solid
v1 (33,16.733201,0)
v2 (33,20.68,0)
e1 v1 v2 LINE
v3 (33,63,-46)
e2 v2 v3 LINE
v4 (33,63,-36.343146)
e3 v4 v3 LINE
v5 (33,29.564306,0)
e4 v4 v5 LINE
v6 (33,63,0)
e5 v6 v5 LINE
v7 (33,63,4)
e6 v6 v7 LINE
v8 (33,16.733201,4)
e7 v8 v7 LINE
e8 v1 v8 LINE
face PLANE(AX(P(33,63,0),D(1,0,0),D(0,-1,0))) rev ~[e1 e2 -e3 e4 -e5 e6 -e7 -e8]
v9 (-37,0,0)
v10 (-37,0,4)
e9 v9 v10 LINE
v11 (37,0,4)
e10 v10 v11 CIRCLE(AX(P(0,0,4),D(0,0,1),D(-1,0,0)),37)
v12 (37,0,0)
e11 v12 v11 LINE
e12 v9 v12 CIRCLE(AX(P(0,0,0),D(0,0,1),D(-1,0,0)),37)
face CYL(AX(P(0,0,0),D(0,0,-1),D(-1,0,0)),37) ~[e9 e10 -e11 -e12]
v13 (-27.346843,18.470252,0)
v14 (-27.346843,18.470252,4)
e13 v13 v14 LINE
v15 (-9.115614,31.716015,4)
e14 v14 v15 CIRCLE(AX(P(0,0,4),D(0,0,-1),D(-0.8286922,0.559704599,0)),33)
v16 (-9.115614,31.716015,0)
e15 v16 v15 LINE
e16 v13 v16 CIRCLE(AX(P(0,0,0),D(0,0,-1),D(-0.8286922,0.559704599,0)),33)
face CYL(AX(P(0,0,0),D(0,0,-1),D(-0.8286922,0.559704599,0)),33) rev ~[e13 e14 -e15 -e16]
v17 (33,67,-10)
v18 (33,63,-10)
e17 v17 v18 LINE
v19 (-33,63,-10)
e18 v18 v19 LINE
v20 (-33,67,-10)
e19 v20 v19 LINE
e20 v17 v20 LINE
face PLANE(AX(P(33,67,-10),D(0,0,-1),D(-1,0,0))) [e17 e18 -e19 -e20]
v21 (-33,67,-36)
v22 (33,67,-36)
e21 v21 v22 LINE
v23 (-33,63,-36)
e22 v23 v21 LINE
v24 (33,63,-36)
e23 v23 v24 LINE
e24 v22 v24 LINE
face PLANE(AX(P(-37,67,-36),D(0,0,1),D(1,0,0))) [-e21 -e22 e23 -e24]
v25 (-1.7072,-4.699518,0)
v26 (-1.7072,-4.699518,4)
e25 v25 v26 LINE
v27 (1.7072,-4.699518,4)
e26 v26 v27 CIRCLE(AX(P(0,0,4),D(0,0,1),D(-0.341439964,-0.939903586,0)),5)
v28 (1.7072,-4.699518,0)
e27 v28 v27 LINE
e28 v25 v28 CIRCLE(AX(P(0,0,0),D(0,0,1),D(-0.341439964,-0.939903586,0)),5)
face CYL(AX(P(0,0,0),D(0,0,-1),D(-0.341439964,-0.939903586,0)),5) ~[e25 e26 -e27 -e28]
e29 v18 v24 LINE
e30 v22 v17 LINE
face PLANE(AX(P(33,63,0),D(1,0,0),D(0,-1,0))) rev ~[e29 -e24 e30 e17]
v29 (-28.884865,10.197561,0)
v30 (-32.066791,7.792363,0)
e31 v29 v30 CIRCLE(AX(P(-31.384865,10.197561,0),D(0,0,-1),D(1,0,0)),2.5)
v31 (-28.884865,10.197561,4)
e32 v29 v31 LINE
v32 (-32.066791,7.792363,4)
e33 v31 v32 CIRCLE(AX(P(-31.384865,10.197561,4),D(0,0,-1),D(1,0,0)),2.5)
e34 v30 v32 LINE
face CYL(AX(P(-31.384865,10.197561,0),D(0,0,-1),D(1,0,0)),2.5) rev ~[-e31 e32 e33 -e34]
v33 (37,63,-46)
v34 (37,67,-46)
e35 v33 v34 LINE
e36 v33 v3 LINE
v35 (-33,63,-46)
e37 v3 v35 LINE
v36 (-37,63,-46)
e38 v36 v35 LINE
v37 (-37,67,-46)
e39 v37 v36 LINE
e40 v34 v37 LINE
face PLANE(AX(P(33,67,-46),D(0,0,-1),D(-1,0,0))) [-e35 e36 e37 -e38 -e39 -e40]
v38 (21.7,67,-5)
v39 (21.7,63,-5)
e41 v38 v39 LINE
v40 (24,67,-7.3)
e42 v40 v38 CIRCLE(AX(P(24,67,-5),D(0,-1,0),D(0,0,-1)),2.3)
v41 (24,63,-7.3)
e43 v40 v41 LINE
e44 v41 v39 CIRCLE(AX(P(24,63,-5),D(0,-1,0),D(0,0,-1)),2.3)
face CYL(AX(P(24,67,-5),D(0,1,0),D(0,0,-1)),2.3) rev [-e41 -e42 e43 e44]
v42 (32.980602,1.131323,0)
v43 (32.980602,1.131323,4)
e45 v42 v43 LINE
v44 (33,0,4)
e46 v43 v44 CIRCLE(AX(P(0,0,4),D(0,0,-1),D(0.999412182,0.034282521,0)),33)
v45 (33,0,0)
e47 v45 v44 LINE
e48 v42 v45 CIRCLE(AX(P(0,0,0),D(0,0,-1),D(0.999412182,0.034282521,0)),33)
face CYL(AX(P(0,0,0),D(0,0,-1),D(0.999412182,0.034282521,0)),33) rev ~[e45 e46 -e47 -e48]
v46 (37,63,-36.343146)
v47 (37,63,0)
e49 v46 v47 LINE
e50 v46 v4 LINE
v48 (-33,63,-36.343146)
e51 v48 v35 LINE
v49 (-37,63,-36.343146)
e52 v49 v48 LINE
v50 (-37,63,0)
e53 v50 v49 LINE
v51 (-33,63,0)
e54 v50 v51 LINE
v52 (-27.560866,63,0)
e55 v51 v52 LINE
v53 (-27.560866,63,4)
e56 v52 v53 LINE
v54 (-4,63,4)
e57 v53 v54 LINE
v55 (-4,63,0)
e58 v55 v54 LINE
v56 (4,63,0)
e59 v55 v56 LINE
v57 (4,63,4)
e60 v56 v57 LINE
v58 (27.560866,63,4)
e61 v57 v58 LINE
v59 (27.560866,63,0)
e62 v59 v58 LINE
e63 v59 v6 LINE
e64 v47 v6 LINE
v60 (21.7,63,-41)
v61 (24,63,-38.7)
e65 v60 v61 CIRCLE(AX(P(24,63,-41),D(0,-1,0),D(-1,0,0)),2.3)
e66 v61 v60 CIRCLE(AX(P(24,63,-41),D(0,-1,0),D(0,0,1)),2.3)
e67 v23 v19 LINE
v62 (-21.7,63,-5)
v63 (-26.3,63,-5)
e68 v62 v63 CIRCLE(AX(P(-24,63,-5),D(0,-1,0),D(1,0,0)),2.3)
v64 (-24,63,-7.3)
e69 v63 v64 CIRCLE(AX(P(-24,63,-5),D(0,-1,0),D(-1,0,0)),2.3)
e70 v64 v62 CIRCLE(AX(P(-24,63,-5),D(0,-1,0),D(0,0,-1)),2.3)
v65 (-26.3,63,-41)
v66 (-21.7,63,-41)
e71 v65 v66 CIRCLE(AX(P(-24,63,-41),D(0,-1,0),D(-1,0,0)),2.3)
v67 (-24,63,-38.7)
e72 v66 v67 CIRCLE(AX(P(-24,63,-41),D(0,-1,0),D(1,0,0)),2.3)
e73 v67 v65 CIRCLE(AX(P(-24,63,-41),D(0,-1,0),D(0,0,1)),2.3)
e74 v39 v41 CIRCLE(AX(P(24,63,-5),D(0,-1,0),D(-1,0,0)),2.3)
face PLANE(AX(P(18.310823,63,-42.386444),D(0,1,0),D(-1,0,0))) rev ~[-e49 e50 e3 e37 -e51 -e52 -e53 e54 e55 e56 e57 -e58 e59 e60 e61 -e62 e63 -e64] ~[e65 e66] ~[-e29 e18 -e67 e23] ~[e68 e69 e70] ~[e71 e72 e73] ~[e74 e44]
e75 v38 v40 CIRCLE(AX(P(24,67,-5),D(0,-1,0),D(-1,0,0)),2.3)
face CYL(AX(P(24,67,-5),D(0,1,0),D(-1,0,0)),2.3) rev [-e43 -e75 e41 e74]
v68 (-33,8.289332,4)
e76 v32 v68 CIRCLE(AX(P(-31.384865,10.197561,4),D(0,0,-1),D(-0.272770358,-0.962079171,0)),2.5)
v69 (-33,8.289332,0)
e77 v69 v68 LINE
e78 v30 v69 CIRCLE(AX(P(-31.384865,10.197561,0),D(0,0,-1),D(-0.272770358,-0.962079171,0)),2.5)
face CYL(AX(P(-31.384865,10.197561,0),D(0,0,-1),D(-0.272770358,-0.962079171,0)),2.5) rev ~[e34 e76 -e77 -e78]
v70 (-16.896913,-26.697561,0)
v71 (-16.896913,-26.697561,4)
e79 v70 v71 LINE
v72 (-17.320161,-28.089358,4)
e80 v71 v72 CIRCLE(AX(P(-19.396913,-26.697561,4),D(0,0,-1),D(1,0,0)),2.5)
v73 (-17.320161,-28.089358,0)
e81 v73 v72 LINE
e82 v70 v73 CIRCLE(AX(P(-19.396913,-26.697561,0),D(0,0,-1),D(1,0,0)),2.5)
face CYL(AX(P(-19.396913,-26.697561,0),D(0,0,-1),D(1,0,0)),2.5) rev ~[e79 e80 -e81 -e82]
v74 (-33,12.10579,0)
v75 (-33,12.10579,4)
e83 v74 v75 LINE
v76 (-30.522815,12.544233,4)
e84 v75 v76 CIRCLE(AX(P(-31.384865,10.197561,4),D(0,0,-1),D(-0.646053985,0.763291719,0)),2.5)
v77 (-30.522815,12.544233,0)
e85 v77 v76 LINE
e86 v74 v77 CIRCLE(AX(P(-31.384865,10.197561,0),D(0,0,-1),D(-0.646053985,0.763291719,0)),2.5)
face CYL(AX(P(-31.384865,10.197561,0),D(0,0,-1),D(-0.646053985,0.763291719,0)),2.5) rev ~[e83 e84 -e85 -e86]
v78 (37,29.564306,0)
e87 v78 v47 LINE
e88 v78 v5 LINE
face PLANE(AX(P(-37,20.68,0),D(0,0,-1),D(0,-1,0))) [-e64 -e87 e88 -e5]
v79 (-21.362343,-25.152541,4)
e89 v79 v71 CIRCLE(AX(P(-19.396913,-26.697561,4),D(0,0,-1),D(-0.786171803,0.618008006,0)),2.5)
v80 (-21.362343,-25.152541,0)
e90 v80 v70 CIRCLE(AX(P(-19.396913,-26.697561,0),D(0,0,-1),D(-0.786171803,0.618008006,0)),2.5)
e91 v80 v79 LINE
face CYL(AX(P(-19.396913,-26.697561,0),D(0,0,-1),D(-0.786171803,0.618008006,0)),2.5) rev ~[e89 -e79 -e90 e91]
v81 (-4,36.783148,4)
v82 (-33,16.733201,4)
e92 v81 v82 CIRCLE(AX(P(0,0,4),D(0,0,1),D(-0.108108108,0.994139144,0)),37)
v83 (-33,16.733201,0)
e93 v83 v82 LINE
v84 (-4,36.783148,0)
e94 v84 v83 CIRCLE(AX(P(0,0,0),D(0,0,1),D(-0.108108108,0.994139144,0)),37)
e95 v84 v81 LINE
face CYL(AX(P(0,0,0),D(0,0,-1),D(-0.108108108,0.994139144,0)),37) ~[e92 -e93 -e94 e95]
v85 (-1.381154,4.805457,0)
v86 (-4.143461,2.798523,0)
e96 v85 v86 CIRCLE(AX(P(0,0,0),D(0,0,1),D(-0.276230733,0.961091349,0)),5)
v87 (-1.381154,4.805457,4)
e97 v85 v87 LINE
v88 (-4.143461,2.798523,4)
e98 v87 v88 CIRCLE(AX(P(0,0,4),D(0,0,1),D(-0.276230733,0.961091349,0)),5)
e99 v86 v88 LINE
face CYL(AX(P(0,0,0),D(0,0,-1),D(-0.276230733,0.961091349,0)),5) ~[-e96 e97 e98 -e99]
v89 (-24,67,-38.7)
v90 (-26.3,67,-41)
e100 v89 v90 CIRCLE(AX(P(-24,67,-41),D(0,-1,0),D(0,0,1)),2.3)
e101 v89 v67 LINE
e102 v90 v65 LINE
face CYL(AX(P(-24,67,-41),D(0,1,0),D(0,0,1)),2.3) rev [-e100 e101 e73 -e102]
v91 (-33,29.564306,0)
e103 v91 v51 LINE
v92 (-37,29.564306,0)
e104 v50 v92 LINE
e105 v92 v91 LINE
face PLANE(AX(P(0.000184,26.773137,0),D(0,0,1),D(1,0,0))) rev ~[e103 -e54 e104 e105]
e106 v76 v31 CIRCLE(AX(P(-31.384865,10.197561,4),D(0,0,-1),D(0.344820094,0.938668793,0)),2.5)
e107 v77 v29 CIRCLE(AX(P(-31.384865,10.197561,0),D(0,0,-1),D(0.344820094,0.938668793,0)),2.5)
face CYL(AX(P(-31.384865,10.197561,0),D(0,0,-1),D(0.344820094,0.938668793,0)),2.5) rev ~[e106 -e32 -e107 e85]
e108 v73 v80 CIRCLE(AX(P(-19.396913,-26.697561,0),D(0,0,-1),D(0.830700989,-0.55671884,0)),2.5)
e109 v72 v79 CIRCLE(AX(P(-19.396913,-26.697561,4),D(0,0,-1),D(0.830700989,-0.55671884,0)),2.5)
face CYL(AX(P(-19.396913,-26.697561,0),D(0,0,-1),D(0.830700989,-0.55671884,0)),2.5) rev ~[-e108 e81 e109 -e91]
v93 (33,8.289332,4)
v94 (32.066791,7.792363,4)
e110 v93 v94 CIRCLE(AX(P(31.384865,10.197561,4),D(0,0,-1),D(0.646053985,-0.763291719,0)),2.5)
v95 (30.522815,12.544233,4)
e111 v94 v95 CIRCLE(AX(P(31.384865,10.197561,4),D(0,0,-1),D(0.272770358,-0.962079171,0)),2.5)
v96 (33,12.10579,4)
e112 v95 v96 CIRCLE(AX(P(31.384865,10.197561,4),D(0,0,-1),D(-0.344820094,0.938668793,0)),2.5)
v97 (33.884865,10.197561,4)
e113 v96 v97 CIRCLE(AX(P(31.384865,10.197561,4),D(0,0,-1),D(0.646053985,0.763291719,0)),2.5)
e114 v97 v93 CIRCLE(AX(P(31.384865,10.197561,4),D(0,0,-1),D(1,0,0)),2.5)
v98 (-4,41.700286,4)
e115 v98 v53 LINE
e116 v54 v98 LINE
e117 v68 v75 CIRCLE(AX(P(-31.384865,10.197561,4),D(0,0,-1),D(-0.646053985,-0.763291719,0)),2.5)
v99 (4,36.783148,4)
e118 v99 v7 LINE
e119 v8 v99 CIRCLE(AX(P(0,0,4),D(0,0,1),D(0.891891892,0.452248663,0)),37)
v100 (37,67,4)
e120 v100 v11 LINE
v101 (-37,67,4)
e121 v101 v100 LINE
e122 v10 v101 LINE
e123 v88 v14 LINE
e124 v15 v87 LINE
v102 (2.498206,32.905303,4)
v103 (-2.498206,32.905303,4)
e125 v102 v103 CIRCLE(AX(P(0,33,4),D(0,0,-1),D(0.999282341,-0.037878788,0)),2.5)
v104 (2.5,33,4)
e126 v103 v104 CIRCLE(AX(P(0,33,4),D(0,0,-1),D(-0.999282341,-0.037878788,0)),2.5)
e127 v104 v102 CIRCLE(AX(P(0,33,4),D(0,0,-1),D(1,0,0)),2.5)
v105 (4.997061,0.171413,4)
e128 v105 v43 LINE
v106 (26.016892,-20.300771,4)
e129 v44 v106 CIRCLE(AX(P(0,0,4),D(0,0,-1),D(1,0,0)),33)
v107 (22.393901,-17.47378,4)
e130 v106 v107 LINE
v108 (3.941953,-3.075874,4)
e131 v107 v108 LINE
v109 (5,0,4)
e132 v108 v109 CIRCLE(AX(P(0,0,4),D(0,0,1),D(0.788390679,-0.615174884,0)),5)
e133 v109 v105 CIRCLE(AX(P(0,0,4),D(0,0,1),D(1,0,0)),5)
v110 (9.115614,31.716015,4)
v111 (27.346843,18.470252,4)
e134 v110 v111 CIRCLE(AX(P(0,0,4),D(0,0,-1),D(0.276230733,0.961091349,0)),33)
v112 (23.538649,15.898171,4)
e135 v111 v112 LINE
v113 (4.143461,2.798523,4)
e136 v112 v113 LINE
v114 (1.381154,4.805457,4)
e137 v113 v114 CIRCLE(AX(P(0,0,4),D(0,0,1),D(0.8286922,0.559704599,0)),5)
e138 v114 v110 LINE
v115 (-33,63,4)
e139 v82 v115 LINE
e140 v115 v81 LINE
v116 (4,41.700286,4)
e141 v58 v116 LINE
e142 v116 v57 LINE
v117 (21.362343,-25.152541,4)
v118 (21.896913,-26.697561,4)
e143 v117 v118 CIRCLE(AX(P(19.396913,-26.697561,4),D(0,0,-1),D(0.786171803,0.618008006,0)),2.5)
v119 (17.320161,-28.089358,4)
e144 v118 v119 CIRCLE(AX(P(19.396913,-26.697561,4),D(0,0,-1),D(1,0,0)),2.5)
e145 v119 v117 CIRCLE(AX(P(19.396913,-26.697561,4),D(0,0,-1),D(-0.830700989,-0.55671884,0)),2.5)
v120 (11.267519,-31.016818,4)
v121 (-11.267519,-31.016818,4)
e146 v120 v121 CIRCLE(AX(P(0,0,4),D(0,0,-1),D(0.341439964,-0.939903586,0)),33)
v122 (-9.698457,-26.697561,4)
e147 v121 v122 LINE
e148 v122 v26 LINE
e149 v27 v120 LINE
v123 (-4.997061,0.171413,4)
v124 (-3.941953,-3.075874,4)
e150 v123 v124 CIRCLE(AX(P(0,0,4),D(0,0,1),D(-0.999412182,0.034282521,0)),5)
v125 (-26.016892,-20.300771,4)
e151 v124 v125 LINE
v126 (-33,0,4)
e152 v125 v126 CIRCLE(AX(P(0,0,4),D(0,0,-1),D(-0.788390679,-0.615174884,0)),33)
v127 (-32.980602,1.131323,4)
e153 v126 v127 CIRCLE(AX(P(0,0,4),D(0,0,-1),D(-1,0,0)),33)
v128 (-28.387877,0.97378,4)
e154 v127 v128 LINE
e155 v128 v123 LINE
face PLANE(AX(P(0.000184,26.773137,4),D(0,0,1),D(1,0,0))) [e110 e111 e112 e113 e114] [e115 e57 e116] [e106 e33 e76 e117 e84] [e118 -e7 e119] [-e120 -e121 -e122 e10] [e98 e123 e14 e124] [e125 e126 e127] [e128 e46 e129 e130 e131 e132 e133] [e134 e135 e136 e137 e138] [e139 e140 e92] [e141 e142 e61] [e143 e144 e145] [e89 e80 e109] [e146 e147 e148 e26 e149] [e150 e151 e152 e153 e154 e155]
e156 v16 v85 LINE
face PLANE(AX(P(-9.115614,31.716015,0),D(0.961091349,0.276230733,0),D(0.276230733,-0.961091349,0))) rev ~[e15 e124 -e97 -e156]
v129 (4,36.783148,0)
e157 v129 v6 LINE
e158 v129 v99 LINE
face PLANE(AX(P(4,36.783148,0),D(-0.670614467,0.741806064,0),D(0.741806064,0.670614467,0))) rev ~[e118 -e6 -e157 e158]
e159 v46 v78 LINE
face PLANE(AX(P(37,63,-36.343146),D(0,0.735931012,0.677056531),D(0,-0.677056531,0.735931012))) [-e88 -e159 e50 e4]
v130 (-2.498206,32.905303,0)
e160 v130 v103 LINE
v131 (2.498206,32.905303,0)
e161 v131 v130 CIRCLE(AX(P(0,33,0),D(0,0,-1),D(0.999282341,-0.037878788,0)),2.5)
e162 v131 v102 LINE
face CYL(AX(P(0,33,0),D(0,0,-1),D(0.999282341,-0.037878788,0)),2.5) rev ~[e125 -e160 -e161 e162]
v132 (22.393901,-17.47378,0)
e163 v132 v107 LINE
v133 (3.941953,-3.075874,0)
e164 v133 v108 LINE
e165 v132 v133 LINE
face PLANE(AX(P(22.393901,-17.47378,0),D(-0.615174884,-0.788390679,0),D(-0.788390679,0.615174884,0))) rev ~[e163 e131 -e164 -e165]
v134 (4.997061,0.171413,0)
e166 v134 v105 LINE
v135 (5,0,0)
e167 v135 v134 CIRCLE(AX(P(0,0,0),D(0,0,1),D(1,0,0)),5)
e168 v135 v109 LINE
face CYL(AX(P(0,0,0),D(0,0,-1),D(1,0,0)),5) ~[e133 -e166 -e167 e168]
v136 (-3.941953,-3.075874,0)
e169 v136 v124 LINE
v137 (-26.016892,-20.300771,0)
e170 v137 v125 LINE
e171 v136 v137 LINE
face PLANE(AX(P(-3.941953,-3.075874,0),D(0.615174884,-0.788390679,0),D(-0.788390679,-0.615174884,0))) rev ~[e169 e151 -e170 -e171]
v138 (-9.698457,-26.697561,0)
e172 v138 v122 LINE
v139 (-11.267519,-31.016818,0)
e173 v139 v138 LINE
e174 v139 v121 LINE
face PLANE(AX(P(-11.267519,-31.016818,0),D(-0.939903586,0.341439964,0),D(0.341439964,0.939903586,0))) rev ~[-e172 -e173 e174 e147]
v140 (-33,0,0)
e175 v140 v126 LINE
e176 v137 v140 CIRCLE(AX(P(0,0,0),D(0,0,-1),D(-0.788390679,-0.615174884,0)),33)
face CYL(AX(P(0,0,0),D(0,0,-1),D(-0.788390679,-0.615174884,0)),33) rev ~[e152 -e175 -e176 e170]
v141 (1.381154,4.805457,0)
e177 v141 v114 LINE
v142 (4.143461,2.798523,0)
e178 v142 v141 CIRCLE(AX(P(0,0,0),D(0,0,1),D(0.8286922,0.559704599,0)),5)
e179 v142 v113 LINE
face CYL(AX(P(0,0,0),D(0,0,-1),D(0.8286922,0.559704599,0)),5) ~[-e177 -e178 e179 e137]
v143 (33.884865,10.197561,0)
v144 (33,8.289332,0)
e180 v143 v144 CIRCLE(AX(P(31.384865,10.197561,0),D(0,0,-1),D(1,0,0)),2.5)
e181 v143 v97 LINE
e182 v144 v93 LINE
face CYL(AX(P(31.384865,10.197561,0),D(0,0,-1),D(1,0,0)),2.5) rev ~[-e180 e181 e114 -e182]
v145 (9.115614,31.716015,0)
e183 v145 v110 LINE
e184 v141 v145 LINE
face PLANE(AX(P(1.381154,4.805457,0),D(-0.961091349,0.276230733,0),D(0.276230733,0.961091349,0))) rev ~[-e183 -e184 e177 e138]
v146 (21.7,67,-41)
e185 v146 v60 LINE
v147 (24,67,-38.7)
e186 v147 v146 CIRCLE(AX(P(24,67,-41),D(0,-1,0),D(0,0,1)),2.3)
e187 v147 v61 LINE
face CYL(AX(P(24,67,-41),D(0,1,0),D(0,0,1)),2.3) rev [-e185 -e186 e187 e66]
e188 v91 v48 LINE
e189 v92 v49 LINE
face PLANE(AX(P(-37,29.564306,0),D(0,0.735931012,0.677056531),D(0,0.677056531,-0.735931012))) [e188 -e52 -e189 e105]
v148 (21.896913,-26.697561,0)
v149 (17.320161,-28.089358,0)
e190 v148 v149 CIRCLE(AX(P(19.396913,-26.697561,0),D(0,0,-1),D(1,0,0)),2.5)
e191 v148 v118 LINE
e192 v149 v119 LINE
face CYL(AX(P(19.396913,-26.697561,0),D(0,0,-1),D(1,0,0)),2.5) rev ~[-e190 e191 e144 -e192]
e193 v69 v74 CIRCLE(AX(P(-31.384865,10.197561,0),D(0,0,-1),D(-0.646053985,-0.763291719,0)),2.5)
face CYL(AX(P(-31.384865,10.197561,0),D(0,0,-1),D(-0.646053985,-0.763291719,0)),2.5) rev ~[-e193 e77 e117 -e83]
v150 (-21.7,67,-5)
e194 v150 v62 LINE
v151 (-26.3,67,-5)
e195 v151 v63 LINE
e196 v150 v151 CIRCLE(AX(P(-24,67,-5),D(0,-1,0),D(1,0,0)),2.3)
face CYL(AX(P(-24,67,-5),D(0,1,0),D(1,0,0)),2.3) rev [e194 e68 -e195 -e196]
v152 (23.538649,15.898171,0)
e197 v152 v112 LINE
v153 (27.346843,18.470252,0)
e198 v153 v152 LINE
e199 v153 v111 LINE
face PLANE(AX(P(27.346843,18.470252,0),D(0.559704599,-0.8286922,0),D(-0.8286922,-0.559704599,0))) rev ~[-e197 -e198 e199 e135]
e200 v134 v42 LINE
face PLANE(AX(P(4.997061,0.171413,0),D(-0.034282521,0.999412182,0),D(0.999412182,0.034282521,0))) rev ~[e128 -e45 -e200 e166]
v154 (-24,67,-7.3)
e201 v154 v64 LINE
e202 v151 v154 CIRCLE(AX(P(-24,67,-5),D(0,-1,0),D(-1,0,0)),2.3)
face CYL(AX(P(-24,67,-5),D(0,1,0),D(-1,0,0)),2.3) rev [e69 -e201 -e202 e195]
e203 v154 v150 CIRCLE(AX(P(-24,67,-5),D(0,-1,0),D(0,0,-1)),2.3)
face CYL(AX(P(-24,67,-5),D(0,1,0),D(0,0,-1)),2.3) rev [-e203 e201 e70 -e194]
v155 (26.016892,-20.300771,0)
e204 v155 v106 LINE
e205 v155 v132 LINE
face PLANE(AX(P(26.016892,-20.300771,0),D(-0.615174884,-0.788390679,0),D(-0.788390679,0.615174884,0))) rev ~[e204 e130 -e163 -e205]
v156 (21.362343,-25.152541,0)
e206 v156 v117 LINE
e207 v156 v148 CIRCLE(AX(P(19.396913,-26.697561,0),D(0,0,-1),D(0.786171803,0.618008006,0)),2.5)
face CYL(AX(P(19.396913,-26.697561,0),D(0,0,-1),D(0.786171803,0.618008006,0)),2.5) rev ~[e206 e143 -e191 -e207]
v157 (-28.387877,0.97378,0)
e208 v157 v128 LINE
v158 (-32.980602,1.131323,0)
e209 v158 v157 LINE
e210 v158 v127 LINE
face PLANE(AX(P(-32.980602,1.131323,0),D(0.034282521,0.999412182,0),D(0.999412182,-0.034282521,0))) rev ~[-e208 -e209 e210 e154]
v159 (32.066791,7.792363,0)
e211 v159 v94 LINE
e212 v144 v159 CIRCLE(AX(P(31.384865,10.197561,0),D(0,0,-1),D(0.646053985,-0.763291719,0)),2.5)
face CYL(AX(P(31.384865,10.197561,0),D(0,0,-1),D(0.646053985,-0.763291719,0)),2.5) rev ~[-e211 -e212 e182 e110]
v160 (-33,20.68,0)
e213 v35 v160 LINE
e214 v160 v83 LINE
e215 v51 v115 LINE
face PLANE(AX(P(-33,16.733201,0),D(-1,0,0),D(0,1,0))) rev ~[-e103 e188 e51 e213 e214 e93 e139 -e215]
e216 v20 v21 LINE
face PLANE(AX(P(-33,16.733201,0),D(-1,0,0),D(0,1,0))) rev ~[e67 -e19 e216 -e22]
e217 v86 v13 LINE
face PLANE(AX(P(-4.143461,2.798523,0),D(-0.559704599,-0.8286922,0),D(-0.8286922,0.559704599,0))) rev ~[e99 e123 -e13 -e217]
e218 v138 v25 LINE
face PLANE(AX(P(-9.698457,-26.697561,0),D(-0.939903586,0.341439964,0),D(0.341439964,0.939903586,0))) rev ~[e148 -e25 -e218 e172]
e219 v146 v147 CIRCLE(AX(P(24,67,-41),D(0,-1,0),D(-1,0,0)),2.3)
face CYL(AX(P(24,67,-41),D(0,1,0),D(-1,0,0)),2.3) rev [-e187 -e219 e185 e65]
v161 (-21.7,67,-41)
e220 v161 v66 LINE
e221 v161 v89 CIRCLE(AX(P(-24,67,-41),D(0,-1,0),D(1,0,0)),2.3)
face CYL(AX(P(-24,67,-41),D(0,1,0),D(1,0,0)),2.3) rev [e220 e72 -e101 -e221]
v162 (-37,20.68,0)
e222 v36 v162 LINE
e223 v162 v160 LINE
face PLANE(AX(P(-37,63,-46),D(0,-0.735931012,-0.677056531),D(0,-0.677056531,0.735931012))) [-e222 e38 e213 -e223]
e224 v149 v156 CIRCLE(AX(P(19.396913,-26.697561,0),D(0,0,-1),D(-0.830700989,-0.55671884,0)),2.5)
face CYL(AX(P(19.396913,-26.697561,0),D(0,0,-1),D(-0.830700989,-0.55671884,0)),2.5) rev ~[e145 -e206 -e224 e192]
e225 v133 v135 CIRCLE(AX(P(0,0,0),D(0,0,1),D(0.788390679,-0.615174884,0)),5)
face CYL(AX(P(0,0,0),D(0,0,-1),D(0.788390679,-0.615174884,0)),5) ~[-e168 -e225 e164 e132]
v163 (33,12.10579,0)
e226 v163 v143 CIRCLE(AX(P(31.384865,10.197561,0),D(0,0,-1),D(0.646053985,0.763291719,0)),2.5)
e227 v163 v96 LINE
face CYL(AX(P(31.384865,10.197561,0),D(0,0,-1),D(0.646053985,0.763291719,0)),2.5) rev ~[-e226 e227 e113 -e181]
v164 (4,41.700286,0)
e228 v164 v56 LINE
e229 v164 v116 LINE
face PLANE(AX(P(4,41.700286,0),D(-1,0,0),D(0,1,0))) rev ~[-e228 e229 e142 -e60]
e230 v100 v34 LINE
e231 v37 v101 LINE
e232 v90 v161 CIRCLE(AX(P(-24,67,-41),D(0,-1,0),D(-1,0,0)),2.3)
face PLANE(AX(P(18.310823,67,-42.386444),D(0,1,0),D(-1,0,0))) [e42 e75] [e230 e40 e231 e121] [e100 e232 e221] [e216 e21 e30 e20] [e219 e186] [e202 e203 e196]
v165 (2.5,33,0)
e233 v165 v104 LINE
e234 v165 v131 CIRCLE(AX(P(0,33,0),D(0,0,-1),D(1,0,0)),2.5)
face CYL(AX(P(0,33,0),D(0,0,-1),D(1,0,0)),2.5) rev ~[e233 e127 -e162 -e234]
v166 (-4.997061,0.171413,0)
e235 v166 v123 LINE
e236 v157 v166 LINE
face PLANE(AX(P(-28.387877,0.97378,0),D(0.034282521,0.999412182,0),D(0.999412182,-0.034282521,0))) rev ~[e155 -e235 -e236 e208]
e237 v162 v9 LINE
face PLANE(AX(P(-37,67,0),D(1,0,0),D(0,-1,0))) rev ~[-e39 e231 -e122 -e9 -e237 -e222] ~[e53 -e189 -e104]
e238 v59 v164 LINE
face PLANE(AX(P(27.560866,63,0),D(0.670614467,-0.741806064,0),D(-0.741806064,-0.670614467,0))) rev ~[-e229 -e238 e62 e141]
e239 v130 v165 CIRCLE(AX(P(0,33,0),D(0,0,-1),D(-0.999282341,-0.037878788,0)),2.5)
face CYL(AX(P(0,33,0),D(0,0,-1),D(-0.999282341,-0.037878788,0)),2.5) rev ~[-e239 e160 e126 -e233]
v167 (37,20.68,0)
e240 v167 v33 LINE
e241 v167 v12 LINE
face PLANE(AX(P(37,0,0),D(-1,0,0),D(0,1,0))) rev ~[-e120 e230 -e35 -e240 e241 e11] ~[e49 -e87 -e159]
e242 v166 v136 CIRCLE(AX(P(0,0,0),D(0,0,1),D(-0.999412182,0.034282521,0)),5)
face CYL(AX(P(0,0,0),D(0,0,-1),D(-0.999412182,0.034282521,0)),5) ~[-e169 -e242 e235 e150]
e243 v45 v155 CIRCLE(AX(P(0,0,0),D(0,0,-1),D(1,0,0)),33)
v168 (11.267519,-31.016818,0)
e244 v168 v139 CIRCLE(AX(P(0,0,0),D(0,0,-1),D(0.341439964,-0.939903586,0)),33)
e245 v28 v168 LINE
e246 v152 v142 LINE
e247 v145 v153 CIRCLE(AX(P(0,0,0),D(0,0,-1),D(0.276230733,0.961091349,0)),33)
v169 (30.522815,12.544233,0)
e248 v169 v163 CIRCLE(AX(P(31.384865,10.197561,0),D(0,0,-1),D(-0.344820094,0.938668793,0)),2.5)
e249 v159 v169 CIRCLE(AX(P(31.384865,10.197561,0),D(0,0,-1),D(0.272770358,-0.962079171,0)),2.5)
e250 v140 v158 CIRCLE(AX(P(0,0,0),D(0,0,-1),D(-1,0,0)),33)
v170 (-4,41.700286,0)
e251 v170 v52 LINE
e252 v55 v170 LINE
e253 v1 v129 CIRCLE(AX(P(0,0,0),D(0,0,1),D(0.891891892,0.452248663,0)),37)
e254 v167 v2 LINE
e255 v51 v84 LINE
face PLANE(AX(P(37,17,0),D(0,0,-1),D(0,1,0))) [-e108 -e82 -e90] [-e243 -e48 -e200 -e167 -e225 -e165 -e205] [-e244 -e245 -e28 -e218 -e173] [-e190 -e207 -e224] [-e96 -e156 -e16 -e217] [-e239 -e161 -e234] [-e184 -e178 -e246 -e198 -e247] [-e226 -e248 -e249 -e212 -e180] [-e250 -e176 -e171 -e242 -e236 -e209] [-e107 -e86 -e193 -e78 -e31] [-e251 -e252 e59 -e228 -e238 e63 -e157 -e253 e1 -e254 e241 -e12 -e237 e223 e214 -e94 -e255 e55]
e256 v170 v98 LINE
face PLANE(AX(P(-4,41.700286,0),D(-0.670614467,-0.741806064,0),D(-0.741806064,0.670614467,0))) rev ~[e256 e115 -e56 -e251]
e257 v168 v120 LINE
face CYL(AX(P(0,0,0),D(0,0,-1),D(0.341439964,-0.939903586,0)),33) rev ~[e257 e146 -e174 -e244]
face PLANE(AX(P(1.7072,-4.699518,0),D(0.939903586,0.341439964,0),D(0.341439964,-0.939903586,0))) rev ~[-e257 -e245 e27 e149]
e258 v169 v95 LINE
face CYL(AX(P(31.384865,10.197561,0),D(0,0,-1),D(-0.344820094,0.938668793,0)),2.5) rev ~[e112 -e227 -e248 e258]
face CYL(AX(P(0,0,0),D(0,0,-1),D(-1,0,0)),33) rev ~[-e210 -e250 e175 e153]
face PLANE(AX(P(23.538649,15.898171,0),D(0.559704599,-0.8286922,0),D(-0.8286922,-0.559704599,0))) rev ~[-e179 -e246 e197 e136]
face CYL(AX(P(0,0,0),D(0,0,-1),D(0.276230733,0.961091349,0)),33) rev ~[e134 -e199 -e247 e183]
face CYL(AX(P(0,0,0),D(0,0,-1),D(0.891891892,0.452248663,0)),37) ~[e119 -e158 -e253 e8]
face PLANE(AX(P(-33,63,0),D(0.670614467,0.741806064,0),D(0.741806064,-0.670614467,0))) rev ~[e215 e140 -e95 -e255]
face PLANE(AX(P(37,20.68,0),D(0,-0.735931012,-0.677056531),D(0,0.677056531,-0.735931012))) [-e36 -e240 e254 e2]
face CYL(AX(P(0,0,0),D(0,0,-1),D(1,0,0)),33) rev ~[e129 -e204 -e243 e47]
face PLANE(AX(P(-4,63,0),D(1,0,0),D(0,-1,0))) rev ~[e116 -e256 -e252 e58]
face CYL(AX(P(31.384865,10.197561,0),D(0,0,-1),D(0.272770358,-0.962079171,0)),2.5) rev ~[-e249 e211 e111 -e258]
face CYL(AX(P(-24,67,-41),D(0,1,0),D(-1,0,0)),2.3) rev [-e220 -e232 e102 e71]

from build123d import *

# Parameters (mm, degrees)
F1_DEPTH = 4
F3_DEPTH = 4
F5_DEPTH = 4
F6_W     = 4
F6_H     = 26
F6_H_2   = 10
F7_DEPTH = 4


with BuildPart() as f1:
    # F0 (on Top) → F1 (new body)
    with BuildSketch(Plane.XY):
        with BuildLine():
            ThreePointArc((-2.498205853, 32.9053030303), (-0.0473569821, 35.499551423), (2.5, 33))
            ThreePointArc((2.5, 33), (2.499551423, 32.9526430179), (2.498205853, 32.9053030303))
            ThreePointArc((2.498205853, 32.9053030303), (5.8372772609, 32.4796273713), (9.1156141969, 31.7160145323))
            ThreePointArc((9.1156141969, 31.7160145323), (19.3969133257, 26.6975608144), (27.3468425908, 18.4702517664))
            ThreePointArc((27.3468425908, 18.4702517664), (29.0861433838, 15.5883374051), (30.5228148036, 12.544232797))
            ThreePointArc((30.5228148036, 12.544232797), (31.8205738268, 12.6592996005), (33, 12.1057901124))
            Line((33, 12.1057901124), (33, 16.7332005307))
            ThreePointArc((33, 16.7332005307), (21.0416278254, 30.4343539188), (4, 36.7831483155))
            ThreePointArc((4, 36.7831483155), (0, 37), (-4, 36.7831483155))
            ThreePointArc((-4, 36.7831483155), (-21.0416278254, 30.4343539188), (-33, 16.7332005307))
            Line((-33, 16.7332005307), (-33, 12.1057901124))
            ThreePointArc((-33, 12.1057901124), (-31.8205738268, 12.6592996005), (-30.5228148036, 12.544232797))
            ThreePointArc((-30.5228148036, 12.544232797), (-29.0861433838, 15.5883374051), (-27.3468425908, 18.4702517664))
            ThreePointArc((-27.3468425908, 18.4702517664), (-19.3969133257, 26.6975608144), (-9.1156141969, 31.7160145323))
            ThreePointArc((-9.1156141969, 31.7160145323), (-5.8372772609, 32.4796273713), (-2.498205853, 32.9053030303))
        make_face()
        with BuildLine():
            ThreePointArc((2.498205853, 32.9053030303), (0, 30.5), (-2.498205853, 32.9053030303))
            ThreePointArc((-2.498205853, 32.9053030303), (-5.8372772609, 32.4796273713), (-9.1156141969, 31.7160145323))
            Line((-9.1156141969, 31.7160145323), (-7.8462162594, 27.2993902036))
            Line((-7.8462162594, 27.2993902036), (-1.3811536662, 4.8054567473))
            ThreePointArc((-1.3811536662, 4.8054567473), (0, 5), (1.3811536662, 4.8054567473))
            Line((1.3811536662, 4.8054567473), (7.8462162594, 27.2993902036))
            Line((7.8462162594, 27.2993902036), (9.1156141969, 31.7160145323))
            ThreePointArc((9.1156141969, 31.7160145323), (5.8372772609, 32.4796273713), (2.498205853, 32.9053030303))
        make_face()
        with BuildLine():
            Line((-4.1434609986, 2.7985229949), (-27.3468425908, 18.4702517664))
            ThreePointArc((-27.3468425908, 18.4702517664), (-29.0861433838, 15.5883374051), (-30.5228148036, 12.544232797))
            ThreePointArc((-30.5228148036, 12.544232797), (-29.3348497225, 11.6284476748), (-28.8848650377, 10.1975608144))
            ThreePointArc((-28.8848650377, 10.1975608144), (-29.8773529706, 8.2032169705), (-32.0667909317, 7.7923628859))
            ThreePointArc((-32.0667909317, 7.7923628859), (-32.6937791328, 4.4851762523), (-32.9806019929, 1.1313232023))
            Line((-32.9806019929, 1.1313232023), (-28.3878771097, 0.9737804072))
            Line((-28.3878771097, 0.9737804072), (-4.997060908, 0.1714126064))
            ThreePointArc((-4.997060908, 0.1714126064), (-4.7552825815, 1.5450849719), (-4.1434609986, 2.7985229949))
        make_face()
        with BuildLine():
            ThreePointArc((30.5228148036, 12.544232797), (29.0861433838, 15.5883374051), (27.3468425908, 18.4702517664))
            Line((27.3468425908, 18.4702517664), (23.5386487783, 15.8981706108))
            Line((23.5386487783, 15.8981706108), (4.1434609986, 2.7985229949))
            ThreePointArc((4.1434609986, 2.7985229949), (4.7552825815, 1.5450849719), (4.997060908, 0.1714126064))
            Line((4.997060908, 0.1714126064), (32.9806019929, 1.1313232023))
            ThreePointArc((32.9806019929, 1.1313232023), (32.6937791328, 4.4851762523), (32.0667909317, 7.7923628859))
            ThreePointArc((32.0667909317, 7.7923628859), (29.007223747, 9.4250183284), (30.5228148036, 12.544232797))
        make_face()
        with BuildLine():
            ThreePointArc((1.3811536662, 4.8054567473), (0, 5), (-1.3811536662, 4.8054567473))
            Line((-1.3811536662, 4.8054567473), (0, 0))
            Line((0, 0), (1.3811536662, 4.8054567473))
        make_face()
        with BuildLine():
            Line((0, 0), (-1.3811536662, 4.8054567473))
            ThreePointArc((-1.3811536662, 4.8054567473), (-2.9389262615, 4.0450849719), (-4.1434609986, 2.7985229949))
            Line((-4.1434609986, 2.7985229949), (0, 0))
        make_face()
        with BuildLine():
            Line((0, 0), (-4.1434609986, 2.7985229949))
            ThreePointArc((-4.1434609986, 2.7985229949), (-4.7552825815, 1.5450849719), (-4.997060908, 0.1714126064))
            Line((-4.997060908, 0.1714126064), (0, 0))
        make_face()
        with BuildLine():
            ThreePointArc((4.1434609986, 2.7985229949), (2.9389262615, 4.0450849719), (1.3811536662, 4.8054567473))
            Line((1.3811536662, 4.8054567473), (0, 0))
            Line((0, 0), (4.1434609986, 2.7985229949))
        make_face()
        with BuildLine():
            Line((-1.7071998188, -4.6995179305), (0, 0))
            Line((0, 0), (-3.9419533944, -3.0758744182))
            ThreePointArc((-3.9419533944, -3.0758744182), (-2.9389262615, -4.0450849719), (-1.7071998188, -4.6995179305))
        make_face()
        with BuildLine():
            Line((-3.9419533944, -3.0758744182), (0, 0))
            Line((0, 0), (-4.997060908, 0.1714126064))
            ThreePointArc((-4.997060908, 0.1714126064), (-4.7552825815, -1.5450849719), (-3.9419533944, -3.0758744182))
        make_face()
        with BuildLine():
            Line((3.9419533944, -3.0758744182), (0, 0))
            Line((0, 0), (1.7071998188, -4.6995179305))
            ThreePointArc((1.7071998188, -4.6995179305), (2.9389262615, -4.0450849719), (3.9419533944, -3.0758744182))
        make_face()
        with BuildLine():
            Line((1.7071998188, -4.6995179305), (0, 0))
            Line((0, 0), (-1.7071998188, -4.6995179305))
            ThreePointArc((-1.7071998188, -4.6995179305), (0, -5), (1.7071998188, -4.6995179305))
        make_face()
        with BuildLine():
            Line((4.1434609986, 2.7985229949), (0, 0))
            Line((0, 0), (4.997060908, 0.1714126064))
            ThreePointArc((4.997060908, 0.1714126064), (4.7552825815, 1.5450849719), (4.1434609986, 2.7985229949))
        make_face()
        with BuildLine():
            Line((4.997060908, 0.1714126064), (0, 0))
            Line((0, 0), (3.9419533944, -3.0758744182))
            ThreePointArc((3.9419533944, -3.0758744182), (4.7280951224, -1.6263814171), (5, 0))
            ThreePointArc((5, 0), (4.999265173, 0.0857189009), (4.997060908, 0.1714126064))
        make_face()
        with BuildLine():
            ThreePointArc((-33, 8.2893315164), (-33.8848650377, 10.1975608144), (-33, 12.1057901124))
            Line((-33, 12.1057901124), (-33, 16.7332005307))
            ThreePointArc((-33, 16.7332005307), (-35.9861084309, 8.602325267), (-37, 0))
            ThreePointArc((-37, 0), (0, -37), (37, 0))
            ThreePointArc((37, 0), (35.9861084309, 8.602325267), (33, 16.7332005307))
            Line((33, 16.7332005307), (33, 12.1057901124))
            ThreePointArc((33, 12.1057901124), (33.6528859157, 11.2492648113), (33.8848650377, 10.1975608144))
            ThreePointArc((33.8848650377, 10.1975608144), (33.6528859157, 9.1458568174), (33, 8.2893315164))
            Line((33, 8.2893315164), (33, 0))
            ThreePointArc((33, 0), (31.2054278075, -10.7341173531), (26.0168924031, -20.3007711599))
            ThreePointArc((26.0168924031, -20.3007711599), (23.8135024738, -22.8455050268), (21.3623428339, -25.152540799))
            ThreePointArc((21.3623428339, -25.152540799), (21.759493882, -25.8801177799), (21.8969133257, -26.6975608144))
            ThreePointArc((21.8969133257, -26.6975608144), (20.1242780272, -29.0894095953), (17.3201608529, -28.0893579142))
            ThreePointArc((17.3201608529, -28.0893579142), (14.3685894638, -29.7076360019), (11.2675188041, -31.016818341))
            ThreePointArc((11.2675188041, -31.016818341), (0, -33), (-11.2675188041, -31.016818341))
            ThreePointArc((-11.2675188041, -31.016818341), (-14.3685894638, -29.7076360019), (-17.3201608529, -28.0893579142))
            ThreePointArc((-17.3201608529, -28.0893579142), (-20.8663764564, -28.7201033003), (-21.3623428339, -25.152540799))
            ThreePointArc((-21.3623428339, -25.152540799), (-23.8135024738, -22.8455050268), (-26.0168924031, -20.3007711599))
            ThreePointArc((-26.0168924031, -20.3007711599), (-31.2054278075, -10.7341173531), (-33, 0))
            Line((-33, 0), (-33, 8.2893315164))
        make_face()
        with BuildLine():
            ThreePointArc((-32.9806019929, 1.1313232023), (-32.6937791328, 4.4851762523), (-32.0667909317, 7.7923628859))
            ThreePointArc((-32.0667909317, 7.7923628859), (-32.5599678414, 7.9909495208), (-33, 8.2893315164))
            Line((-33, 8.2893315164), (-33, 0))
            ThreePointArc((-33, 0), (-32.9951501418, 0.565744746), (-32.9806019929, 1.1313232023))
        make_face()
        with BuildLine():
            ThreePointArc((33, 8.2893315164), (32.5599678414, 7.9909495208), (32.0667909317, 7.7923628859))
            ThreePointArc((32.0667909317, 7.7923628859), (32.6937791328, 4.4851762523), (32.9806019929, 1.1313232023))
            ThreePointArc((32.9806019929, 1.1313232023), (32.9951501418, 0.565744746), (33, 0))
            Line((33, 0), (33, 8.2893315164))
        make_face()
        with BuildLine():
            ThreePointArc((-1.7071998188, -4.6995179305), (-2.9389262615, -4.0450849719), (-3.9419533944, -3.0758744182))
            Line((-3.9419533944, -3.0758744182), (-26.0168924031, -20.3007711599))
            ThreePointArc((-26.0168924031, -20.3007711599), (-23.8135024738, -22.8455050268), (-21.3623428339, -25.152540799))
            ThreePointArc((-21.3623428339, -25.152540799), (-18.5794702912, -24.334980258), (-16.8969133257, -26.6975608144))
            ThreePointArc((-16.8969133257, -26.6975608144), (-17.0050645447, -27.4249255159), (-17.3201608529, -28.0893579142))
            ThreePointArc((-17.3201608529, -28.0893579142), (-14.3685894638, -29.7076360019), (-11.2675188041, -31.016818341))
            Line((-11.2675188041, -31.016818341), (-9.6984566628, -26.6975608144))
            Line((-9.6984566628, -26.6975608144), (-1.7071998188, -4.6995179305))
        make_face()
        with BuildLine():
            ThreePointArc((3.9419533944, -3.0758744182), (2.9389262615, -4.0450849719), (1.7071998188, -4.6995179305))
            Line((1.7071998188, -4.6995179305), (11.2675188041, -31.016818341))
            ThreePointArc((11.2675188041, -31.016818341), (14.3685894638, -29.7076360019), (17.3201608529, -28.0893579142))
            ThreePointArc((17.3201608529, -28.0893579142), (17.9274501949, -24.6750183284), (21.3623428339, -25.152540799))
            ThreePointArc((21.3623428339, -25.152540799), (23.8135024738, -22.8455050268), (26.0168924031, -20.3007711599))
            Line((26.0168924031, -20.3007711599), (22.3939012537, -17.4737804072))
            Line((22.3939012537, -17.4737804072), (3.9419533944, -3.0758744182))
        make_face()
        with BuildLine():
            ThreePointArc((-37, 0), (-35.9861084309, 8.602325267), (-33, 16.7332005307))
            Line((-33, 16.7332005307), (-33, 63))
            Line((-33, 63), (-27.5608655065, 63))
            Line((-27.5608655065, 63), (-4, 63))
            Line((-4, 63), (0, 63))
            Line((0, 63), (4, 63))
            Line((4, 63), (27.5608655065, 63))
            Line((27.5608655065, 63), (33, 63))
            Line((33, 63), (33, 16.7332005307))
            ThreePointArc((33, 16.7332005307), (35.9861084309, 8.602325267), (37, 0))
            Line((37, 0), (37, 67))
            Line((37, 67), (0, 67))
            Line((0, 67), (-37, 67))
            Line((-37, 67), (-37, 0))
        make_face()
        Polygon((-27.5608655065, 63), (-33, 63), (-4, 36.7831483155), (-4, 41.7002856364), align=None)
        with BuildLine():
            Line((-4, 41.7002856364), (-4, 36.7831483155))
            ThreePointArc((-4, 36.7831483155), (0, 37), (4, 36.7831483155))
            Line((4, 36.7831483155), (4, 41.7002856364))
            Line((4, 41.7002856364), (-4, 41.7002856364))
        make_face()
        Polygon((4, 36.7831483155), (33, 63), (27.5608655065, 63), (4, 41.7002856364), align=None)
        Polygon((-4, 63), (-4, 41.7002856364), (4, 41.7002856364), (4, 63), (0, 63), align=None)
    extrude(amount=F1_DEPTH)

    # F2 (on face) → F3 (join)
    with BuildSketch(Plane(origin=(-37, 0, 0), x_dir=(0, -1, 0), z_dir=(-1, 0, 0))):
        Polygon((-17, 0), (-17, 4), (-20.68, 0), align=None)
        Polygon((-17, 4), (-67, 4), (-67, 0), (-63, 0), (-29.5643059095, 0), (-20.68, 0), align=None)
        Polygon((-63, 0), (-67, 0), (-67, -46), (-63, -46), (-63, -36.3431457505), align=None)
        Polygon((-63, -46), (-20.68, 0), (-29.5643059095, 0), (-63, -36.3431457505), align=None)
    extrude(amount=-F3_DEPTH)

    # F4 (on face) → F5 (join)
    with BuildSketch(Plane.YZ.offset(37)):
        Polygon((20.68, 0), (17, 4), (17, 0), align=None)
        Polygon((67, 0), (67, 4), (17, 4), (20.68, 0), (26.6568542495, 0), (29.5643059095, 0), (63, 0), align=None)
        Polygon((67, -46), (67, 0), (63, 0), (63, -36.3431457505), (29.5643059095, 0), (26.6568542495, 0), (20.68, 0), (63, -46), align=None)
    extrude(amount=-F5_DEPTH)

    # F6 (on face) → F7 (join)
    with BuildSketch(Plane(origin=(0, 67, 0), x_dir=(-1, 0, 0), z_dir=(0, 1, 0))):
        with BuildLine():
            Line((-33, -36), (-33, -46))
            Line((-33, -46), (0, -46))
            Line((0, -46), (0, -41))
            Line((0, -41), (-21.7, -41))
            ThreePointArc((-21.7, -41), (-25.6263455967, -42.6263455967), (-24, -38.7))
            Line((-24, -38.7), (-24, -36))
            Line((-24, -36), (-33, -36))
        make_face()
        with Locations((-35, -23)):
            Rectangle(F6_W, F6_H)
        with BuildLine():
            Line((0, -41), (0, -46))
            Line((0, -46), (33, -46))
            Line((33, -46), (33, -36))
            Line((33, -36), (24, -36))
            Line((24, -36), (24, -38.7))
            ThreePointArc((24, -38.7), (25.6263455967, -39.3736544033), (26.3, -41))
            ThreePointArc((26.3, -41), (24, -43.3), (21.7, -41))
            Line((21.7, -41), (0, -41))
        make_face()
        with Locations((35, -41)):
            Rectangle(F6_W, F6_H_2)
        with BuildLine():
            Line((-21.7, -41), (0, -41))
            Line((0, -41), (0, -36))
            Line((0, -36), (-24, -36))
            Line((-24, -36), (-24, -38.7))
            ThreePointArc((-24, -38.7), (-22.3736544033, -39.3736544033), (-21.7, -41))
        make_face()
        with BuildLine():
            Line((0, -36), (0, -41))
            Line((0, -41), (21.7, -41))
            ThreePointArc((21.7, -41), (22.3736544033, -39.3736544033), (24, -38.7))
            Line((24, -38.7), (24, -36))
            Line((24, -36), (0, -36))
        make_face()
        with BuildLine():
            Line((-33, 0), (-33, -10))
            Line((-33, -10), (-24, -10))
            Line((-24, -10), (-24, -7.3))
            ThreePointArc((-24, -7.3), (-25.6263455967, -3.3736544033), (-21.7, -5))
            Line((-21.7, -5), (0, -5))
            Line((0, -5), (0, 0))
            Line((0, 0), (-33, 0))
        make_face()
        Polygon((-37, 4), (-37, 0), (-33, 0), (0, 0), (33, 0), (37, 0), (37, 4), align=None)
        with BuildLine():
            Line((-24, -7.3), (-24, -10))
            Line((-24, -10), (0, -10))
            Line((0, -10), (0, -5))
            Line((0, -5), (-21.7, -5))
            ThreePointArc((-21.7, -5), (-22.3736544033, -6.6263455967), (-24, -7.3))
        make_face()
        with BuildLine():
            Line((24, -10), (33, -10))
            Line((33, -10), (33, 0))
            Line((33, 0), (0, 0))
            Line((0, 0), (0, -5))
            Line((0, -5), (21.7, -5))
            ThreePointArc((21.7, -5), (24, -2.7), (26.3, -5))
            ThreePointArc((26.3, -5), (25.6263455967, -6.6263455967), (24, -7.3))
            Line((24, -7.3), (24, -10))
        make_face()
        with BuildLine():
            Line((0, -5), (0, -10))
            Line((0, -10), (24, -10))
            Line((24, -10), (24, -7.3))
            ThreePointArc((24, -7.3), (22.3736544033, -6.6263455967), (21.7, -5))
            Line((21.7, -5), (0, -5))
        make_face()
    extrude(amount=-F7_DEPTH)


solid = f1.part
